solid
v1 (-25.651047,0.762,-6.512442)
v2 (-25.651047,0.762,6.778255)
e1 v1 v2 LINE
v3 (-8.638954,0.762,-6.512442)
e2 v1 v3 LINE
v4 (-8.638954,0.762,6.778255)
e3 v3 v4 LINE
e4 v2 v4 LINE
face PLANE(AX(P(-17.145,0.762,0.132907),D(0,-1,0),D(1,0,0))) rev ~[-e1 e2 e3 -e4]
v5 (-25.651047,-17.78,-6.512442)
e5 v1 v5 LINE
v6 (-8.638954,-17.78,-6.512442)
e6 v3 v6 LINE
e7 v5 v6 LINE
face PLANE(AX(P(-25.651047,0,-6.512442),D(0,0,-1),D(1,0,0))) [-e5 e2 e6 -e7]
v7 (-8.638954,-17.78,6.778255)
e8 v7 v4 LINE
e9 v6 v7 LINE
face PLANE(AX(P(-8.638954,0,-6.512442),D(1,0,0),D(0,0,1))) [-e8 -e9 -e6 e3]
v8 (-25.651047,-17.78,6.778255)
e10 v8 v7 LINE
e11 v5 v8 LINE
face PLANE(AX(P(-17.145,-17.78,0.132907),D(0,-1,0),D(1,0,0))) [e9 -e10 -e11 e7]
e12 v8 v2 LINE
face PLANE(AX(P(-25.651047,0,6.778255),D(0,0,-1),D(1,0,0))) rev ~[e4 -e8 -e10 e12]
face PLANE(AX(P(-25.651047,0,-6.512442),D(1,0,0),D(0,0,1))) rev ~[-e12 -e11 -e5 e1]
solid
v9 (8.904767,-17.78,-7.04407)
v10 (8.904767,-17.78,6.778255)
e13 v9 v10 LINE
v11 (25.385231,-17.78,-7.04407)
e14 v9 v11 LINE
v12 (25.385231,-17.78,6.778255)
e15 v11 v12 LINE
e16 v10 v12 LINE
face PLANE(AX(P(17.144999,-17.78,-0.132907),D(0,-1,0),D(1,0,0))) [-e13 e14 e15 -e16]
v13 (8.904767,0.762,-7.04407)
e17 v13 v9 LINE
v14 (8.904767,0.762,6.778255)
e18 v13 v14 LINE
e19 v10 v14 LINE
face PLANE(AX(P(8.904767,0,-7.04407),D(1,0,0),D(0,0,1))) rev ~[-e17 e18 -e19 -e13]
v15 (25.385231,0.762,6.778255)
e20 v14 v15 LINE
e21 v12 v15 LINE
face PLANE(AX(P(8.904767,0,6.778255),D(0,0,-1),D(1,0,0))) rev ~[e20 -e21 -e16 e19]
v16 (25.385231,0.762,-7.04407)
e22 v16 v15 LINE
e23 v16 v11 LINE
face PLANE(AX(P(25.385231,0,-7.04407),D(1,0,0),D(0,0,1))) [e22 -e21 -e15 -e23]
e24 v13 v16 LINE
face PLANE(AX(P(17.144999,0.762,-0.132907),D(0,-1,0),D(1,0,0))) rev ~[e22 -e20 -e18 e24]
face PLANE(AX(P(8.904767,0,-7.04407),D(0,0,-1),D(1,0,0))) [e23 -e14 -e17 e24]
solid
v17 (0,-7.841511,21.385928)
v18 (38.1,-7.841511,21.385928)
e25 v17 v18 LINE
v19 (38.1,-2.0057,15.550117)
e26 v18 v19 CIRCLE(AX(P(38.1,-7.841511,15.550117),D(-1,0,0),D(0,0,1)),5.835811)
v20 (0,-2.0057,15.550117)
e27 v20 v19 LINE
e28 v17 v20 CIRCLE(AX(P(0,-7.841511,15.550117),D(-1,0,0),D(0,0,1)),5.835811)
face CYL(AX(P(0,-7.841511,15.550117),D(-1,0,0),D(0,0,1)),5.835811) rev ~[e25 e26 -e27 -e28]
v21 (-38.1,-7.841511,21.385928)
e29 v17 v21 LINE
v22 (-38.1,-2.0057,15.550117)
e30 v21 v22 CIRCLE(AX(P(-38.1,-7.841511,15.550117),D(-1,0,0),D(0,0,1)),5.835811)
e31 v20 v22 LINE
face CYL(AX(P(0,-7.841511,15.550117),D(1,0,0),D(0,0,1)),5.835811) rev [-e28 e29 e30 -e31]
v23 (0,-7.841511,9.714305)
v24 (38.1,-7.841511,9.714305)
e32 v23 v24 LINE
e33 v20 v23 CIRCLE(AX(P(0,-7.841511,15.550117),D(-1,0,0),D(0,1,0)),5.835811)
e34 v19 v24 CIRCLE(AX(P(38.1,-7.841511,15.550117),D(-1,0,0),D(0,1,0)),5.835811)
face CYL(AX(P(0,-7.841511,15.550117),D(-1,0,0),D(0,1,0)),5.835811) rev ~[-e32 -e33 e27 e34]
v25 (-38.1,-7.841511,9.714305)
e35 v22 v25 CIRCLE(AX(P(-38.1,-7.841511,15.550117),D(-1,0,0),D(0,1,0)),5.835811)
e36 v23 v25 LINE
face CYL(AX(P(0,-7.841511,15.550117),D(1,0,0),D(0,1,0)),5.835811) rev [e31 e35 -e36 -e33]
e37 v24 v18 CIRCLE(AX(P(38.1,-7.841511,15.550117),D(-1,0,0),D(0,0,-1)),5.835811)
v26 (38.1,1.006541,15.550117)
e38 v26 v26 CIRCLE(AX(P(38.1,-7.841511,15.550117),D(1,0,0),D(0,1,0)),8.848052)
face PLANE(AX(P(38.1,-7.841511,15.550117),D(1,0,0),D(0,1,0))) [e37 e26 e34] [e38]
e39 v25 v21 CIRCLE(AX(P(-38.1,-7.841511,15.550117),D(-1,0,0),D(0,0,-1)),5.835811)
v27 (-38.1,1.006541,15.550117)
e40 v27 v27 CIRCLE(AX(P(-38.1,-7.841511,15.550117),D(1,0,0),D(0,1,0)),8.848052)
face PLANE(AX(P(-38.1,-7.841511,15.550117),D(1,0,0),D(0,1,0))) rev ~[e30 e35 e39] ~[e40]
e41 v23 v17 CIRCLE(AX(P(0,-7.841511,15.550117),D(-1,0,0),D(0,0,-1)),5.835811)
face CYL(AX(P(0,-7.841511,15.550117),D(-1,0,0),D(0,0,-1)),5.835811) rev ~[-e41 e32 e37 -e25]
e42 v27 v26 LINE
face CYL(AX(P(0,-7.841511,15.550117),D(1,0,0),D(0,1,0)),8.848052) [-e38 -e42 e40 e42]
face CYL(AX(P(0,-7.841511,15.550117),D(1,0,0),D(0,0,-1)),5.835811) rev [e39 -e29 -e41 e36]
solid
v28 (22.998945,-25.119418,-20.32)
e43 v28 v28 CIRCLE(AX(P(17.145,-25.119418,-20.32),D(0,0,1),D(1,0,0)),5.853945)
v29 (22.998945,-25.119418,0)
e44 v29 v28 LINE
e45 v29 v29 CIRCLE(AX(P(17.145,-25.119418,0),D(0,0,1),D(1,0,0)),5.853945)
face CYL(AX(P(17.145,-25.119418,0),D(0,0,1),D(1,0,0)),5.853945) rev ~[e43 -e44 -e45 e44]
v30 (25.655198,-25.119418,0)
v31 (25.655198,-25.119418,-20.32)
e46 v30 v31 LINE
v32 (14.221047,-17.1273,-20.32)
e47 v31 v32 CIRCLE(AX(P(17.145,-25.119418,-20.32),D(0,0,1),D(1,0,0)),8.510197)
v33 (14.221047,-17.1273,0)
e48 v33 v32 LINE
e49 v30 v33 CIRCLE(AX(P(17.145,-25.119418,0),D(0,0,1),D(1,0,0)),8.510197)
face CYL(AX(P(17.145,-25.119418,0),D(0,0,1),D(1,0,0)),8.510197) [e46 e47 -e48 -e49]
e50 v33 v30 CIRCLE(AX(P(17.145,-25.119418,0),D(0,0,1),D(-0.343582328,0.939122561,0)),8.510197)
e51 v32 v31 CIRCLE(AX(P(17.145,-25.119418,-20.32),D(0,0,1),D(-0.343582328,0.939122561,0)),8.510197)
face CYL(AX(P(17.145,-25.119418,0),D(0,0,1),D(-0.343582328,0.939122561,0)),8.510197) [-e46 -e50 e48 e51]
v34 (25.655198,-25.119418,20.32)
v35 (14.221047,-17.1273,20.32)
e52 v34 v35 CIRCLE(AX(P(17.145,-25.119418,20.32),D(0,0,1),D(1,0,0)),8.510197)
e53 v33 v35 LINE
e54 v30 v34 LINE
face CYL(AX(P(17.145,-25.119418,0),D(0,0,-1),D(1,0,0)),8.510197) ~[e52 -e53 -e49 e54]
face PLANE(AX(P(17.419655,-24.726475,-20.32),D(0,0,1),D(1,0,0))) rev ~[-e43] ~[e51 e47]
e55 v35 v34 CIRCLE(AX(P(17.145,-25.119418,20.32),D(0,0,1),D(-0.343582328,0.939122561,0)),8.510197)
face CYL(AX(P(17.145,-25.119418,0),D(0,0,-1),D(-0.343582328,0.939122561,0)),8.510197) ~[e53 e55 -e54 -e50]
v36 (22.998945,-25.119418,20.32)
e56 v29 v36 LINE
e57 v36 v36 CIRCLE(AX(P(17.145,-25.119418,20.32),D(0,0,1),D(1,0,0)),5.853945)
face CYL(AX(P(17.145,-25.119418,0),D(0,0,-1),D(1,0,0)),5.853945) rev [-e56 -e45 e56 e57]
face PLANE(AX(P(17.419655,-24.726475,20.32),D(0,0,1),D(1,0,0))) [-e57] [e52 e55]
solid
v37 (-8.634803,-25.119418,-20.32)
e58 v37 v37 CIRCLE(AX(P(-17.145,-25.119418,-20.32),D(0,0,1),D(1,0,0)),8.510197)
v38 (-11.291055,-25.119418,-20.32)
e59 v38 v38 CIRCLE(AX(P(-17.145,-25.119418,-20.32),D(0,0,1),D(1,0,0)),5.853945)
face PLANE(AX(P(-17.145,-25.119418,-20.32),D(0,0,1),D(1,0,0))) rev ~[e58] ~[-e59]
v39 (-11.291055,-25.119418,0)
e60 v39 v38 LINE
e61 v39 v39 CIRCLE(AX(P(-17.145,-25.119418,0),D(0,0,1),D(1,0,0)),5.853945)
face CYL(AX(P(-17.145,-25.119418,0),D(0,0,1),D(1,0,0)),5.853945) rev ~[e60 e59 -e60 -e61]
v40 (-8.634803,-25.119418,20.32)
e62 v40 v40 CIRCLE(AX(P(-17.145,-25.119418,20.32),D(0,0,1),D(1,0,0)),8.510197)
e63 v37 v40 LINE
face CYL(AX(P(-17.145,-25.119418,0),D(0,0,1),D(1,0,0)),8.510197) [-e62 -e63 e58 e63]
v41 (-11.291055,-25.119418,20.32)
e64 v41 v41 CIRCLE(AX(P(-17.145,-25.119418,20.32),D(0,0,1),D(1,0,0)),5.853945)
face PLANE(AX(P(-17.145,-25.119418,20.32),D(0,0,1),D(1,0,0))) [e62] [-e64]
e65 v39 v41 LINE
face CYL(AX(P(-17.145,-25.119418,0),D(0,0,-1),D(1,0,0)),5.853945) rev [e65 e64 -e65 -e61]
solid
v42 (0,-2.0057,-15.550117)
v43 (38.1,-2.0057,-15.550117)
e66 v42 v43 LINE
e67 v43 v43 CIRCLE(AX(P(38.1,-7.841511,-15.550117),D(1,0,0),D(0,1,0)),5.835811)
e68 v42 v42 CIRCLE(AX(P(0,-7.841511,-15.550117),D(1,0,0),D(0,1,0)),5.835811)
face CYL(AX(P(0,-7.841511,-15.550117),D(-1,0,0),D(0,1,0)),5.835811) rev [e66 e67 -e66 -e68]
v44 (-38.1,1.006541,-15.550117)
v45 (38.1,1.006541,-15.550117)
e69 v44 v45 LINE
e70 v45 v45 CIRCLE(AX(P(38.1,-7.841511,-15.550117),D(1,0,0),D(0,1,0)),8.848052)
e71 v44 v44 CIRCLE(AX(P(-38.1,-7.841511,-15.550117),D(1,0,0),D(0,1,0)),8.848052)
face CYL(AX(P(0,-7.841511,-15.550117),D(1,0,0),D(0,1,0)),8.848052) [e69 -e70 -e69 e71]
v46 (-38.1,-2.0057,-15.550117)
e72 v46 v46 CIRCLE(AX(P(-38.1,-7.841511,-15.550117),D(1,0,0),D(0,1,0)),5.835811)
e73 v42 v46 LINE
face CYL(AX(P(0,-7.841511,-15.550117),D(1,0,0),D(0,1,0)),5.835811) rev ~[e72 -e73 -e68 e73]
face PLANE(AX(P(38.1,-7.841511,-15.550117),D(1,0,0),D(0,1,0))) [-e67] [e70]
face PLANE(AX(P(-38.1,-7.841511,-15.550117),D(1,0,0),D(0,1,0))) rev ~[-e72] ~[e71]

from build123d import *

# Parameters (mm, degrees)
F2_R          = 8.8480516112
F3_DEPTH      = 38.1
F3_DEPTH_BACK = 38.1
F2_R_2        = 5.8358111442
F4_R          = 8.5101971468
F4_R_2        = 5.8539450754
F5_DEPTH      = 20.32
F5_DEPTH_BACK = 20.32
F6_W          = 16.4804635569
F6_H          = 13.8223250397
F7_DEPTH      = 17.78
F7_DEPTH_BACK = 0.762
F6_W_2        = 17.0120932162
F6_H_2        = 13.2906967774


# Not quite as in the source:
# - the program builds the solid bodies; features that only make, move or delete a surface that nothing else refers to are left out


with BuildPart() as f3:
    # F2 (on Right) → F3 (new body, two sides)
    with BuildSketch(Plane.YZ) as f3_sk:
        with Locations((-7.8415106982, 15.5501165427)):
            Circle(F2_R)
        with BuildLine():
            ThreePointArc((-7.8415106982, 21.3859276869), (-3.7149690644, 19.6766581765), (-2.005699554, 15.5501165427))
            ThreePointArc((-2.005699554, 15.5501165427), (-3.7149690644, 11.4235749089), (-7.8415106982, 9.7143053985))
            ThreePointArc((-7.8415106982, 9.7143053985), (-13.6773218424, 15.5501165427), (-7.8415106982, 21.3859276869))
        make_face(mode=Mode.SUBTRACT)
    extrude(amount=F3_DEPTH)
    extrude(f3_sk.sketch, amount=-F3_DEPTH_BACK)


with BuildPart() as f3b:
    # F2 (on Right) → F3, piece 2 (new body, two sides)
    with BuildSketch(Plane.YZ) as f3_2_sk:
        with Locations((-7.8415106982, -15.5501165427)):
            Circle(F2_R)
        with Locations((-7.8415106982, -15.5501165427)):
            Circle(F2_R_2, mode=Mode.SUBTRACT)
    extrude(amount=F3_DEPTH)
    extrude(f3_2_sk.sketch, amount=-F3_DEPTH_BACK)


with BuildPart() as f5:
    # F4 (on Top) → F5 (new body, two sides)
    with BuildSketch(Plane.XY) as f5_sk:
        with Locations((-17.1450003982, -25.1194182783)):
            Circle(F4_R)
        with Locations((-17.1450003982, -25.1194182783)):
            Circle(F4_R_2, mode=Mode.SUBTRACT)
    extrude(amount=F5_DEPTH)
    extrude(f5_sk.sketch, amount=-F5_DEPTH_BACK)


with BuildPart() as f5b:
    # F4 (on Top) → F5, piece 2 (new body, two sides)
    with BuildSketch(Plane.XY) as f5_2_sk:
        with BuildLine():
            ThreePointArc((14.2210470513, -17.1273001421), (12.2695498524, -32.094619885), (25.655197545, -25.1194182783))
            ThreePointArc((25.655197545, -25.1194182783), (22.0204509439, -18.1442166716), (14.2210470513, -17.1273001421))
        make_face()
        with Locations((17.1450003982, -25.1194182783)):
            Circle(F4_R_2, mode=Mode.SUBTRACT)
    extrude(amount=F5_DEPTH)
    extrude(f5_2_sk.sketch, amount=-F5_DEPTH_BACK)


with BuildPart() as f7:
    # F6 (on Front) → F7 (new body, two sides)
    with BuildSketch(Plane.XZ) as f7_sk:
        with Locations((17.1449990012, -0.1329074148)):
            Rectangle(F6_W, F6_H)
    extrude(amount=F7_DEPTH)
    extrude(f7_sk.sketch, amount=-F7_DEPTH_BACK)


with BuildPart() as f7b:
    # F6 (on Front) → F7, piece 2 (new body, two sides)
    with BuildSketch(Plane.XZ) as f7_2_sk:
        with Locations((-17.1450003982, 0.1329067163)):
            Rectangle(F6_W_2, F6_H_2)
    extrude(amount=F7_DEPTH)
    extrude(f7_2_sk.sketch, amount=-F7_DEPTH_BACK)


solid = Compound([f3.part, f3b.part, f5.part, f5b.part, f7.part, f7b.part])
